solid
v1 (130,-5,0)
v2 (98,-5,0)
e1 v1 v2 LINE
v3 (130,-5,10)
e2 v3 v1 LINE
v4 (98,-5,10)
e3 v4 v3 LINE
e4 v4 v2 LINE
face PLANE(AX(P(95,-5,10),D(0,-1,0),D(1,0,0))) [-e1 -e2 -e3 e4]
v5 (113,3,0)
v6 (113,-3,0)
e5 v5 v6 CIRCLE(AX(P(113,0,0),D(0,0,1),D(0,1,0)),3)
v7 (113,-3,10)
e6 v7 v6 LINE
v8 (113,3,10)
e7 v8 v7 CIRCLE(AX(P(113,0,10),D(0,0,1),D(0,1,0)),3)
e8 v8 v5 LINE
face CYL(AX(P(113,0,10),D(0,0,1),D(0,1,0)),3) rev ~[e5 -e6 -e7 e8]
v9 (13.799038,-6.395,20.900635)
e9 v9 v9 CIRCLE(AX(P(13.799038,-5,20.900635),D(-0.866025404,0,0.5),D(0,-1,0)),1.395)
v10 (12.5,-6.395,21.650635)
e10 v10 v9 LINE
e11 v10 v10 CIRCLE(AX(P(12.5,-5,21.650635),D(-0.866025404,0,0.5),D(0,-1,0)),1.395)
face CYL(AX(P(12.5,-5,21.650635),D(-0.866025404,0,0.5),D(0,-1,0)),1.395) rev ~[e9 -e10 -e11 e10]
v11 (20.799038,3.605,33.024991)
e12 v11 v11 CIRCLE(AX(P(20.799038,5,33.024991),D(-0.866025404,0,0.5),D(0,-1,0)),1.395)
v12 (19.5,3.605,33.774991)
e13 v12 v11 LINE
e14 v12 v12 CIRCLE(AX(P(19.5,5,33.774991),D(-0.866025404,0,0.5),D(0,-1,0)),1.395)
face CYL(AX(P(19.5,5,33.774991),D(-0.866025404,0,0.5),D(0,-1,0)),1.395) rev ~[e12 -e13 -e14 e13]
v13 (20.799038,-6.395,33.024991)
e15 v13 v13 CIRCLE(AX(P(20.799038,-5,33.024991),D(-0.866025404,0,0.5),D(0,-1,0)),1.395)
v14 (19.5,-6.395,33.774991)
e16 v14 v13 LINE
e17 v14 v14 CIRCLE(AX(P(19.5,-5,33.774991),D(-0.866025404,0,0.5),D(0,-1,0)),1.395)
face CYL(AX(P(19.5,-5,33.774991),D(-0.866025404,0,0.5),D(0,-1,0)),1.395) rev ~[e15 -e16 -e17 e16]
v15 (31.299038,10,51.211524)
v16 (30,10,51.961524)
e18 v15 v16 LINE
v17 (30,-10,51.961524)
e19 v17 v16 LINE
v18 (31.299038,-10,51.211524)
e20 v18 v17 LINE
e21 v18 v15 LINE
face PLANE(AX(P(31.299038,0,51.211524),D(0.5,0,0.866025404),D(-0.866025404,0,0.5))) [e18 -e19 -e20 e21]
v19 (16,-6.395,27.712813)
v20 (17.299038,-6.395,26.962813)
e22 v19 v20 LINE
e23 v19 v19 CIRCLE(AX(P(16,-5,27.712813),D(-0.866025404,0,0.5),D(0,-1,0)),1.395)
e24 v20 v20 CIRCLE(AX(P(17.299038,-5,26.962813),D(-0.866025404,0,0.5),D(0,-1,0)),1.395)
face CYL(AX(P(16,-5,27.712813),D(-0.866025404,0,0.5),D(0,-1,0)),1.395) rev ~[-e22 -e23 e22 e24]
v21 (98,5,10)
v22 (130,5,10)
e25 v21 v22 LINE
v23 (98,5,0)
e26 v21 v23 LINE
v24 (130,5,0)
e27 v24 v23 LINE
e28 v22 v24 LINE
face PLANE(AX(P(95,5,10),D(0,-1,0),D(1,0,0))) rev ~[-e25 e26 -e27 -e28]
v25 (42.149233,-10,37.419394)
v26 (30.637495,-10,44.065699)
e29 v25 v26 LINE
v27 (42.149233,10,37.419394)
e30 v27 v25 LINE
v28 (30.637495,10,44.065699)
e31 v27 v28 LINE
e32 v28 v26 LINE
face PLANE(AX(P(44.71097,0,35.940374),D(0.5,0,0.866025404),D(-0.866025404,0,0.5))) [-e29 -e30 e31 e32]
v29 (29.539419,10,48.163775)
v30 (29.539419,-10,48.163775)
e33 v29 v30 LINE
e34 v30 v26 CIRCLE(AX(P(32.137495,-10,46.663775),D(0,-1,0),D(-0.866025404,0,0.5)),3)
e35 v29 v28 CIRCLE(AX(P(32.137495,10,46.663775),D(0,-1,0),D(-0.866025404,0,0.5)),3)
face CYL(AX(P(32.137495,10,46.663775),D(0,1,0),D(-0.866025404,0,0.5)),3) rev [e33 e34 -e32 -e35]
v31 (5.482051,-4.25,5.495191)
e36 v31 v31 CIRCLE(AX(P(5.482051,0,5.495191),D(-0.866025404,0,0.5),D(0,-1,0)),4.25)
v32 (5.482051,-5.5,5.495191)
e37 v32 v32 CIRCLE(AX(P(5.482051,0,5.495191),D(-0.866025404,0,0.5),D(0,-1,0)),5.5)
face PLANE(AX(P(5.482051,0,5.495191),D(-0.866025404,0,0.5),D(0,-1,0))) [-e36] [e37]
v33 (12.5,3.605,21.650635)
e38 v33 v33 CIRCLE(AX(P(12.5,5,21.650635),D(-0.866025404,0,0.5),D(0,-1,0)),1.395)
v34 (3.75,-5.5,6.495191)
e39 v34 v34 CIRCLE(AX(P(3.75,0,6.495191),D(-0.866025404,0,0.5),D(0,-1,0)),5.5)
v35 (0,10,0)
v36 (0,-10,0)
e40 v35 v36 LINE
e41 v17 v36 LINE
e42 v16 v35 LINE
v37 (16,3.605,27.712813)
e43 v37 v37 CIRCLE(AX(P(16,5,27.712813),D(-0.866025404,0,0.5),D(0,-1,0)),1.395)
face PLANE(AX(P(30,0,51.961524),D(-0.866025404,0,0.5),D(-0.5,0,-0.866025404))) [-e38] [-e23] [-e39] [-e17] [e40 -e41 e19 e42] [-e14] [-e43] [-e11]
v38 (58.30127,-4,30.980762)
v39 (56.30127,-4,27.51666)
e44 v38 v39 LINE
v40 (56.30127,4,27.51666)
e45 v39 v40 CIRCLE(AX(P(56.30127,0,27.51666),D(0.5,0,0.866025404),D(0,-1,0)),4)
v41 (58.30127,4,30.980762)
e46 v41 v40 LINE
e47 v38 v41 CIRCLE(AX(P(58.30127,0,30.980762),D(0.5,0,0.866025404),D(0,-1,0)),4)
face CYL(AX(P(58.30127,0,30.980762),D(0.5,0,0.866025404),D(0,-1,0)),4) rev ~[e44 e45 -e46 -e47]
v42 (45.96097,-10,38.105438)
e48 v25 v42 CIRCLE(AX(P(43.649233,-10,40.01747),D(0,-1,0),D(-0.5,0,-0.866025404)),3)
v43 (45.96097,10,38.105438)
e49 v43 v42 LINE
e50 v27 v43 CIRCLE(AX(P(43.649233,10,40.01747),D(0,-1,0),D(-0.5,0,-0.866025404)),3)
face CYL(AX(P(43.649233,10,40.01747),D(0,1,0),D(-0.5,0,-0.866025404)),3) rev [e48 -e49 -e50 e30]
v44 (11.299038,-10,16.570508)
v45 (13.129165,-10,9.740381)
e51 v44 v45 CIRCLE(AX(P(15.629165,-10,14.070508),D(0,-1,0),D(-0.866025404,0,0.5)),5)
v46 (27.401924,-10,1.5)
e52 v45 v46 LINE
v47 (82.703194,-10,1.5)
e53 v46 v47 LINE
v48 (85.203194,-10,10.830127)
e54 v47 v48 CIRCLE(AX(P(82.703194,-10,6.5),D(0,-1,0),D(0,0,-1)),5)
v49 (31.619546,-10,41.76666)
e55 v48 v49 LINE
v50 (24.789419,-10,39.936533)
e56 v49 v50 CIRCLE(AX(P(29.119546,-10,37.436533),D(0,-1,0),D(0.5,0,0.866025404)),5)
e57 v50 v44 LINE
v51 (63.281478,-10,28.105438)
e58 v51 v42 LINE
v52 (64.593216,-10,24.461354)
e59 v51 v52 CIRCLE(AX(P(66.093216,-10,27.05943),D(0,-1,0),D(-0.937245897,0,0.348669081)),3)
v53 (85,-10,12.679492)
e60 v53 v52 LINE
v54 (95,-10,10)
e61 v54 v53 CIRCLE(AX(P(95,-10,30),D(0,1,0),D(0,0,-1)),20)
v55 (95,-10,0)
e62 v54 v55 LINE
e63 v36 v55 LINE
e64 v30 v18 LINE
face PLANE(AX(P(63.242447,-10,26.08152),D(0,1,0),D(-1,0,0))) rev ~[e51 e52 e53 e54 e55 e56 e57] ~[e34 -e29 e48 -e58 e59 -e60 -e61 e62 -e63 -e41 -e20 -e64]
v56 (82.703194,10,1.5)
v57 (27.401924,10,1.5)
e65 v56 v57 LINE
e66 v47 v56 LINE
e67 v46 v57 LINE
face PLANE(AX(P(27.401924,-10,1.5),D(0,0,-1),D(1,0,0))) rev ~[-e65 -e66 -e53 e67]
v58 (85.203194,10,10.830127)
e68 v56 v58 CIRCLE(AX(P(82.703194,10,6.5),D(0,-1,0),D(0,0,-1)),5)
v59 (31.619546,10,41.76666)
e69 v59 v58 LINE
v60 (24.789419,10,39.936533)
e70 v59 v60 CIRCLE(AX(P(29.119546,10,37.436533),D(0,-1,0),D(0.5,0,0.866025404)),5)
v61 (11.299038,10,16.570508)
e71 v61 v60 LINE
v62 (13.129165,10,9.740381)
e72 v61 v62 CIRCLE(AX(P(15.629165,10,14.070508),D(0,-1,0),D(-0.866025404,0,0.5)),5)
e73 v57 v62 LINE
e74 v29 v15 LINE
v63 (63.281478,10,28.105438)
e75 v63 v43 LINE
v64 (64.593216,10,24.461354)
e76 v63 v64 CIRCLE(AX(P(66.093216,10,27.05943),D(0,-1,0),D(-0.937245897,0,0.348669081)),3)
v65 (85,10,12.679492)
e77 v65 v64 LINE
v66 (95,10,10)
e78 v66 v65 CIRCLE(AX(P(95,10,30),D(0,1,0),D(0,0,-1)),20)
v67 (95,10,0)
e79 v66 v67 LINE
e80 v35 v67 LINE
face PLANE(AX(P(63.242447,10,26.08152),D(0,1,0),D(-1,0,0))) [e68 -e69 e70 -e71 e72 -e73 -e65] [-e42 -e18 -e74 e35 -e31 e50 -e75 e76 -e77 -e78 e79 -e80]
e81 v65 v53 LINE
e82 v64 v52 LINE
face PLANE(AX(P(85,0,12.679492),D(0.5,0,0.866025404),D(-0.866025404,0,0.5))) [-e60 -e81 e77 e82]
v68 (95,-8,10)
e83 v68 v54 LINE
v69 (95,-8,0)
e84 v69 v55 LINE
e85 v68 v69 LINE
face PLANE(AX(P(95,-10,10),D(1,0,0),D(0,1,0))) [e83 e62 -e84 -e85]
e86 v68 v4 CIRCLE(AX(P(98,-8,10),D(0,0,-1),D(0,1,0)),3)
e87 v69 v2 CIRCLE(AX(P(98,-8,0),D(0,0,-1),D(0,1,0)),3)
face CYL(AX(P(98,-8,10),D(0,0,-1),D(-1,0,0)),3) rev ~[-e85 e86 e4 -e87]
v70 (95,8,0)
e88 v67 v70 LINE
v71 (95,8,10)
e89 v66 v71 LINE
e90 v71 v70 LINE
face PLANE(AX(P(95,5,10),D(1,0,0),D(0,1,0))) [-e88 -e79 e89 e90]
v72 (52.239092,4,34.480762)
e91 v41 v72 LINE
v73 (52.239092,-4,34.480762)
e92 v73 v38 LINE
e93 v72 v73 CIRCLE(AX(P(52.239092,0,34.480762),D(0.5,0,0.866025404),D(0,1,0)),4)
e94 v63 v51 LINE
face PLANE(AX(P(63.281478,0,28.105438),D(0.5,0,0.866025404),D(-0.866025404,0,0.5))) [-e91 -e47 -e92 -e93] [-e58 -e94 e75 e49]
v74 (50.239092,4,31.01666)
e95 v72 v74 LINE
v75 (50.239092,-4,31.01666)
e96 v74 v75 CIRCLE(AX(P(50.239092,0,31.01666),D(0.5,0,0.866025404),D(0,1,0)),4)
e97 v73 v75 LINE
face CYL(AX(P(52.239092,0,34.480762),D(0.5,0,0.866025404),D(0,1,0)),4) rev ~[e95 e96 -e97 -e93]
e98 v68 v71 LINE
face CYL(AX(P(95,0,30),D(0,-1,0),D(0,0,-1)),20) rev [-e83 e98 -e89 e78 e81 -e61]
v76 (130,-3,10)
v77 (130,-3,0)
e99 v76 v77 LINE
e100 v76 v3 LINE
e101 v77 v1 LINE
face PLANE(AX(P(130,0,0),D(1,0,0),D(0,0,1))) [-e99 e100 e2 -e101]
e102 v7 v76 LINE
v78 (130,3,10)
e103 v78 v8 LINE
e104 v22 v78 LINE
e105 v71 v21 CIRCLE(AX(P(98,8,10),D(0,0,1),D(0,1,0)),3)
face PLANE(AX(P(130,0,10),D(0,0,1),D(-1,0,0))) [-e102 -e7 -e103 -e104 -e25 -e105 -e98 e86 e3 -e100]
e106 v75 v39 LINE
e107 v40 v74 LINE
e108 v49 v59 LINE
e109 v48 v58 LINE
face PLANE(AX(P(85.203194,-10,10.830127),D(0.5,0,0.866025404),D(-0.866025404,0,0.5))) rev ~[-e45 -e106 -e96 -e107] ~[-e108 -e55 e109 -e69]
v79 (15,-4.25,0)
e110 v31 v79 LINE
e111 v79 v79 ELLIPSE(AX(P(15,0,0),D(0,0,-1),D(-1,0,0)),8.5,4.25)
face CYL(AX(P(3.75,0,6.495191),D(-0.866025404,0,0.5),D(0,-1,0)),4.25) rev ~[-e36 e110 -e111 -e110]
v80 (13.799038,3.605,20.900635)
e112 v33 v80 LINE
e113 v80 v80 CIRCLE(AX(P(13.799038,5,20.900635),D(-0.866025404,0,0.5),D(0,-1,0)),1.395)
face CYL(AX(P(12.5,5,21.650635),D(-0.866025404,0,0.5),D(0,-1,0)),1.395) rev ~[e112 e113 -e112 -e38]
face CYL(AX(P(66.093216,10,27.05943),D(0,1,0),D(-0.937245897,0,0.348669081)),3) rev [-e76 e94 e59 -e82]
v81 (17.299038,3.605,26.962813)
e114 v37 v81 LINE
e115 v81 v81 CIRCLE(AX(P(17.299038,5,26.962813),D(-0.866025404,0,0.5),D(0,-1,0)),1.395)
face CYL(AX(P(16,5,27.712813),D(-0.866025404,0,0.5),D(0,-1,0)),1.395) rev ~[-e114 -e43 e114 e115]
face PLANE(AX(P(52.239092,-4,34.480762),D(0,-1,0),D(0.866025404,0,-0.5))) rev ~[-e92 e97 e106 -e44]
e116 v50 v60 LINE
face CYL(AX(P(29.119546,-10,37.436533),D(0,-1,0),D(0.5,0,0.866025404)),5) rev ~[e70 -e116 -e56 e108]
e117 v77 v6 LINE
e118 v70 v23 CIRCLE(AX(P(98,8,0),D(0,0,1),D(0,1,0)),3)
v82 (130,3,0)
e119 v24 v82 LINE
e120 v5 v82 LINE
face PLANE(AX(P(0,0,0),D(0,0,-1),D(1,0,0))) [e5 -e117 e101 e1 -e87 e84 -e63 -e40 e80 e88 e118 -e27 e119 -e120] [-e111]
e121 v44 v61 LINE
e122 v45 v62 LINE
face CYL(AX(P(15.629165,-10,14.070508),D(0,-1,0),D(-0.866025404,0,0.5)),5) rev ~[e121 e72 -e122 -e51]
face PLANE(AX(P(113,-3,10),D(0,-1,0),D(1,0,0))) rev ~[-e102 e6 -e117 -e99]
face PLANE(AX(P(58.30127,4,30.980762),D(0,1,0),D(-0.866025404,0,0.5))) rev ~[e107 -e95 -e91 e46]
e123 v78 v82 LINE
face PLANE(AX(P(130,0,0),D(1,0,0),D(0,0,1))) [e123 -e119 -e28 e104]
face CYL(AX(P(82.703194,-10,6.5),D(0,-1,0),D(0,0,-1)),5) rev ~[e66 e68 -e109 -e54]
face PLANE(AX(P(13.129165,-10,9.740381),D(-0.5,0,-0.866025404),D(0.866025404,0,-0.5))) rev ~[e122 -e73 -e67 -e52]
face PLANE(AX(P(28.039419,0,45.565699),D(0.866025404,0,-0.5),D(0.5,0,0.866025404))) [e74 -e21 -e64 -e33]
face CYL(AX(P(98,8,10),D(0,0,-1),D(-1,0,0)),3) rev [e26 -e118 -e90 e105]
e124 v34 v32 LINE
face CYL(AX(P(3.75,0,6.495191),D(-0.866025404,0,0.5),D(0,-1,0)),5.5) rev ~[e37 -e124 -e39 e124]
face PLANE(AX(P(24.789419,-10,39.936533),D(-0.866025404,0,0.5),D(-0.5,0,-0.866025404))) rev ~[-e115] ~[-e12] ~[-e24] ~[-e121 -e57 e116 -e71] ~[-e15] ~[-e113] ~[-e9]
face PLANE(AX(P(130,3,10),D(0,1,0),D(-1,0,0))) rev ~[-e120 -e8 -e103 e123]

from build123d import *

# Parameters (mm, degrees)
F1_DEPTH    = 10
F2_T1_DEPTH = 20
F4_DEPTH    = 20.001
F5_W        = 35
F5_H        = 5
F6_DEPTH    = 10.001
F7_R        = 3
F9_DEPTH    = 10.001
F11_DEPTH   = 4
F12_R       = 5.5
F13_DEPTH   = 2
F14_R       = 4.25
F15_DEPTH   = 112.584302492
F16_R       = 1.395
F17_DEPTH   = 25


# Not quite as in the source:
# - a fillet or chamfer that OpenCascade refuses, or shapes differently, is made with other operations: its cross-section is extruded or revolved along the edge and cut away or added


with BuildPart() as f1:
    # F0 (on Front) → F1 (new body, symmetric)
    with BuildSketch(Plane.XZ):
        with BuildLine():
            Line((30, 51.9615242271), (0, 0))
            Line((0, 0), (130, 0))
            Line((130, 0), (130, 10))
            Line((130, 10), (95, 10))
            ThreePointArc((95, 10), (89.8236190979, 10.6814834742), (85, 12.6794919243))
            Line((85, 12.6794919243), (62.0314784198, 25.9403740415))
            Line((62.0314784198, 25.9403740415), (63.2814784198, 28.105437551))
            Line((63.2814784198, 28.105437551), (45.9609703441, 38.105437551))
            Line((45.9609703441, 38.105437551), (44.7109703441, 35.9403740415))
            Line((44.7109703441, 35.9403740415), (28.0394191624, 45.5656986041))
            Line((28.0394191624, 45.5656986041), (31.2990381057, 51.2115242271))
            Line((31.2990381057, 51.2115242271), (30, 51.9615242271))
        make_face()
    extrude(amount=F1_DEPTH, both=True)

    # F2: fillet of radius 3 on 3 edges, made by hand

    # F2_s2 → F2_t1 (join)
    with BuildSketch(Plane.XZ.offset(-10)):
        with BuildLine():
            ThreePointArc((63.2814784198, 28.105437551), (63.2705212044, 26.0433626604), (64.5932161113, 24.4613540958))
            Line((64.5932161113, 24.4613540958), (62.0314784198, 25.9403740415))
            Line((62.0314784198, 25.9403740415), (63.2814784198, 28.105437551))
        make_face()
        with BuildLine():
            ThreePointArc((42.1492326526, 37.4193939873), (44.180639712, 37.0649108788), (45.9609703441, 38.105437551))
            Line((45.9609703441, 38.105437551), (44.7109703441, 35.9403740415))
            Line((44.7109703441, 35.9403740415), (42.1492326526, 37.4193939873))
        make_face()
        with BuildLine():
            ThreePointArc((29.5394191624, 48.1637748154), (29.2397178949, 45.8873176801), (30.6374953738, 44.0656986041))
            Line((30.6374953738, 44.0656986041), (28.0394191624, 45.5656986041))
            Line((28.0394191624, 45.5656986041), (29.5394191624, 48.1637748154))
        make_face()
    extrude(amount=F2_T1_DEPTH)

    # F3 (on face) → F4 (cut, through all)
    with BuildSketch(Plane.XZ.offset(10)):
        with BuildLine():
            ThreePointArc((82.7031939779, 1.5), (87.5328231093, 5.2059047745), (85.2031939779, 10.8301270189))
            Line((85.2031939779, 10.8301270189), (31.6195461814, 41.7666604984))
            ThreePointArc((31.6195461814, 41.7666604984), (27.8254509559, 42.2661626109), (24.7894191624, 39.9365334795))
            Line((24.7894191624, 39.9365334795), (11.2990381057, 16.5705080757))
            ThreePointArc((11.2990381057, 16.5705080757), (10.7995359932, 12.7764128502), (13.1291651246, 9.7403810568))
            Line((13.1291651246, 9.7403810568), (27.4019237886, 1.5))
            Line((27.4019237886, 1.5), (82.7031939779, 1.5))
        make_face()
    extrude(amount=-F4_DEPTH, mode=Mode.SUBTRACT)

    # F5 (on face) → F6 (cut, through all)
    with BuildSketch(Plane.XY.offset(10)):
        with Locations((112.5, 7.5)):
            Rectangle(F5_W, F5_H)
        with Locations((112.5, -7.5)):
            Rectangle(F5_W, F5_H)
    extrude(amount=-F6_DEPTH, mode=Mode.SUBTRACT)

    # F7
    f7_edges = [f1.edges().sort_by_distance(p)[0] for p in [
        (95, -5, 5),
        (95, 5, 5),
    ]]
    fillet(f7_edges, radius=F7_R)

    # F8 (on face) → F9 (cut, through all)
    with BuildSketch(Plane.XY.offset(10)):
        with BuildLine():
            Line((130, -3), (130, 3))
            Line((130, 3), (113, 3))
            ThreePointArc((113, 3), (110, 0), (113, -3))
            Line((113, -3), (130, -3))
        make_face()
    extrude(amount=-F9_DEPTH, mode=Mode.SUBTRACT)

    # F10 (on face) → F11 (cut)
    with BuildSketch(Plane(origin=(27.9903810568, 0, 48.4807621135), x_dir=(0.8660254038, 0, -0.5), z_dir=(0.5, 0, 0.8660254038))):
        with BuildLine():
            Line((35, 4), (28, 4))
            ThreePointArc((28, 4), (24, 0), (28, -4))
            Line((28, -4), (35, -4))
            ThreePointArc((35, -4), (39, 0), (35, 4))
        make_face()
    extrude(amount=-F11_DEPTH, mode=Mode.SUBTRACT)

    # F12 (on face) → F13 (cut)
    with BuildSketch(Plane(origin=(0, 0, 0), x_dir=(0, -1, 0), z_dir=(-0.8660254038, 0, 0.5))):
        with Locations((0, 7.5)):
            Circle(F12_R)
    extrude(amount=-F13_DEPTH, mode=Mode.SUBTRACT)

    # F14 (on face) → F15 (cut, through all)
    with BuildSketch(Plane(origin=(0, 0, 0), x_dir=(0, -1, 0), z_dir=(-0.8660254038, 0, 0.5))):
        with Locations((0, 7.5)):
            Circle(F14_R)
    extrude(amount=-F15_DEPTH, mode=Mode.SUBTRACT)

    # F16 (on face) → F17 (cut)
    with BuildSketch(Plane(origin=(0, 0, 0), x_dir=(0, -1, 0), z_dir=(-0.8660254038, 0, 0.5))):
        with Locations((-5, 25)):
            Circle(F16_R)
        with Locations((-5, 32)):
            Circle(F16_R)
        with Locations((-5, 39)):
            Circle(F16_R)
        with Locations((5, 39)):
            Circle(F16_R)
        with Locations((5, 32)):
            Circle(F16_R)
        with Locations((5, 25)):
            Circle(F16_R)
    extrude(amount=-F17_DEPTH, mode=Mode.SUBTRACT)


solid = f1.part
